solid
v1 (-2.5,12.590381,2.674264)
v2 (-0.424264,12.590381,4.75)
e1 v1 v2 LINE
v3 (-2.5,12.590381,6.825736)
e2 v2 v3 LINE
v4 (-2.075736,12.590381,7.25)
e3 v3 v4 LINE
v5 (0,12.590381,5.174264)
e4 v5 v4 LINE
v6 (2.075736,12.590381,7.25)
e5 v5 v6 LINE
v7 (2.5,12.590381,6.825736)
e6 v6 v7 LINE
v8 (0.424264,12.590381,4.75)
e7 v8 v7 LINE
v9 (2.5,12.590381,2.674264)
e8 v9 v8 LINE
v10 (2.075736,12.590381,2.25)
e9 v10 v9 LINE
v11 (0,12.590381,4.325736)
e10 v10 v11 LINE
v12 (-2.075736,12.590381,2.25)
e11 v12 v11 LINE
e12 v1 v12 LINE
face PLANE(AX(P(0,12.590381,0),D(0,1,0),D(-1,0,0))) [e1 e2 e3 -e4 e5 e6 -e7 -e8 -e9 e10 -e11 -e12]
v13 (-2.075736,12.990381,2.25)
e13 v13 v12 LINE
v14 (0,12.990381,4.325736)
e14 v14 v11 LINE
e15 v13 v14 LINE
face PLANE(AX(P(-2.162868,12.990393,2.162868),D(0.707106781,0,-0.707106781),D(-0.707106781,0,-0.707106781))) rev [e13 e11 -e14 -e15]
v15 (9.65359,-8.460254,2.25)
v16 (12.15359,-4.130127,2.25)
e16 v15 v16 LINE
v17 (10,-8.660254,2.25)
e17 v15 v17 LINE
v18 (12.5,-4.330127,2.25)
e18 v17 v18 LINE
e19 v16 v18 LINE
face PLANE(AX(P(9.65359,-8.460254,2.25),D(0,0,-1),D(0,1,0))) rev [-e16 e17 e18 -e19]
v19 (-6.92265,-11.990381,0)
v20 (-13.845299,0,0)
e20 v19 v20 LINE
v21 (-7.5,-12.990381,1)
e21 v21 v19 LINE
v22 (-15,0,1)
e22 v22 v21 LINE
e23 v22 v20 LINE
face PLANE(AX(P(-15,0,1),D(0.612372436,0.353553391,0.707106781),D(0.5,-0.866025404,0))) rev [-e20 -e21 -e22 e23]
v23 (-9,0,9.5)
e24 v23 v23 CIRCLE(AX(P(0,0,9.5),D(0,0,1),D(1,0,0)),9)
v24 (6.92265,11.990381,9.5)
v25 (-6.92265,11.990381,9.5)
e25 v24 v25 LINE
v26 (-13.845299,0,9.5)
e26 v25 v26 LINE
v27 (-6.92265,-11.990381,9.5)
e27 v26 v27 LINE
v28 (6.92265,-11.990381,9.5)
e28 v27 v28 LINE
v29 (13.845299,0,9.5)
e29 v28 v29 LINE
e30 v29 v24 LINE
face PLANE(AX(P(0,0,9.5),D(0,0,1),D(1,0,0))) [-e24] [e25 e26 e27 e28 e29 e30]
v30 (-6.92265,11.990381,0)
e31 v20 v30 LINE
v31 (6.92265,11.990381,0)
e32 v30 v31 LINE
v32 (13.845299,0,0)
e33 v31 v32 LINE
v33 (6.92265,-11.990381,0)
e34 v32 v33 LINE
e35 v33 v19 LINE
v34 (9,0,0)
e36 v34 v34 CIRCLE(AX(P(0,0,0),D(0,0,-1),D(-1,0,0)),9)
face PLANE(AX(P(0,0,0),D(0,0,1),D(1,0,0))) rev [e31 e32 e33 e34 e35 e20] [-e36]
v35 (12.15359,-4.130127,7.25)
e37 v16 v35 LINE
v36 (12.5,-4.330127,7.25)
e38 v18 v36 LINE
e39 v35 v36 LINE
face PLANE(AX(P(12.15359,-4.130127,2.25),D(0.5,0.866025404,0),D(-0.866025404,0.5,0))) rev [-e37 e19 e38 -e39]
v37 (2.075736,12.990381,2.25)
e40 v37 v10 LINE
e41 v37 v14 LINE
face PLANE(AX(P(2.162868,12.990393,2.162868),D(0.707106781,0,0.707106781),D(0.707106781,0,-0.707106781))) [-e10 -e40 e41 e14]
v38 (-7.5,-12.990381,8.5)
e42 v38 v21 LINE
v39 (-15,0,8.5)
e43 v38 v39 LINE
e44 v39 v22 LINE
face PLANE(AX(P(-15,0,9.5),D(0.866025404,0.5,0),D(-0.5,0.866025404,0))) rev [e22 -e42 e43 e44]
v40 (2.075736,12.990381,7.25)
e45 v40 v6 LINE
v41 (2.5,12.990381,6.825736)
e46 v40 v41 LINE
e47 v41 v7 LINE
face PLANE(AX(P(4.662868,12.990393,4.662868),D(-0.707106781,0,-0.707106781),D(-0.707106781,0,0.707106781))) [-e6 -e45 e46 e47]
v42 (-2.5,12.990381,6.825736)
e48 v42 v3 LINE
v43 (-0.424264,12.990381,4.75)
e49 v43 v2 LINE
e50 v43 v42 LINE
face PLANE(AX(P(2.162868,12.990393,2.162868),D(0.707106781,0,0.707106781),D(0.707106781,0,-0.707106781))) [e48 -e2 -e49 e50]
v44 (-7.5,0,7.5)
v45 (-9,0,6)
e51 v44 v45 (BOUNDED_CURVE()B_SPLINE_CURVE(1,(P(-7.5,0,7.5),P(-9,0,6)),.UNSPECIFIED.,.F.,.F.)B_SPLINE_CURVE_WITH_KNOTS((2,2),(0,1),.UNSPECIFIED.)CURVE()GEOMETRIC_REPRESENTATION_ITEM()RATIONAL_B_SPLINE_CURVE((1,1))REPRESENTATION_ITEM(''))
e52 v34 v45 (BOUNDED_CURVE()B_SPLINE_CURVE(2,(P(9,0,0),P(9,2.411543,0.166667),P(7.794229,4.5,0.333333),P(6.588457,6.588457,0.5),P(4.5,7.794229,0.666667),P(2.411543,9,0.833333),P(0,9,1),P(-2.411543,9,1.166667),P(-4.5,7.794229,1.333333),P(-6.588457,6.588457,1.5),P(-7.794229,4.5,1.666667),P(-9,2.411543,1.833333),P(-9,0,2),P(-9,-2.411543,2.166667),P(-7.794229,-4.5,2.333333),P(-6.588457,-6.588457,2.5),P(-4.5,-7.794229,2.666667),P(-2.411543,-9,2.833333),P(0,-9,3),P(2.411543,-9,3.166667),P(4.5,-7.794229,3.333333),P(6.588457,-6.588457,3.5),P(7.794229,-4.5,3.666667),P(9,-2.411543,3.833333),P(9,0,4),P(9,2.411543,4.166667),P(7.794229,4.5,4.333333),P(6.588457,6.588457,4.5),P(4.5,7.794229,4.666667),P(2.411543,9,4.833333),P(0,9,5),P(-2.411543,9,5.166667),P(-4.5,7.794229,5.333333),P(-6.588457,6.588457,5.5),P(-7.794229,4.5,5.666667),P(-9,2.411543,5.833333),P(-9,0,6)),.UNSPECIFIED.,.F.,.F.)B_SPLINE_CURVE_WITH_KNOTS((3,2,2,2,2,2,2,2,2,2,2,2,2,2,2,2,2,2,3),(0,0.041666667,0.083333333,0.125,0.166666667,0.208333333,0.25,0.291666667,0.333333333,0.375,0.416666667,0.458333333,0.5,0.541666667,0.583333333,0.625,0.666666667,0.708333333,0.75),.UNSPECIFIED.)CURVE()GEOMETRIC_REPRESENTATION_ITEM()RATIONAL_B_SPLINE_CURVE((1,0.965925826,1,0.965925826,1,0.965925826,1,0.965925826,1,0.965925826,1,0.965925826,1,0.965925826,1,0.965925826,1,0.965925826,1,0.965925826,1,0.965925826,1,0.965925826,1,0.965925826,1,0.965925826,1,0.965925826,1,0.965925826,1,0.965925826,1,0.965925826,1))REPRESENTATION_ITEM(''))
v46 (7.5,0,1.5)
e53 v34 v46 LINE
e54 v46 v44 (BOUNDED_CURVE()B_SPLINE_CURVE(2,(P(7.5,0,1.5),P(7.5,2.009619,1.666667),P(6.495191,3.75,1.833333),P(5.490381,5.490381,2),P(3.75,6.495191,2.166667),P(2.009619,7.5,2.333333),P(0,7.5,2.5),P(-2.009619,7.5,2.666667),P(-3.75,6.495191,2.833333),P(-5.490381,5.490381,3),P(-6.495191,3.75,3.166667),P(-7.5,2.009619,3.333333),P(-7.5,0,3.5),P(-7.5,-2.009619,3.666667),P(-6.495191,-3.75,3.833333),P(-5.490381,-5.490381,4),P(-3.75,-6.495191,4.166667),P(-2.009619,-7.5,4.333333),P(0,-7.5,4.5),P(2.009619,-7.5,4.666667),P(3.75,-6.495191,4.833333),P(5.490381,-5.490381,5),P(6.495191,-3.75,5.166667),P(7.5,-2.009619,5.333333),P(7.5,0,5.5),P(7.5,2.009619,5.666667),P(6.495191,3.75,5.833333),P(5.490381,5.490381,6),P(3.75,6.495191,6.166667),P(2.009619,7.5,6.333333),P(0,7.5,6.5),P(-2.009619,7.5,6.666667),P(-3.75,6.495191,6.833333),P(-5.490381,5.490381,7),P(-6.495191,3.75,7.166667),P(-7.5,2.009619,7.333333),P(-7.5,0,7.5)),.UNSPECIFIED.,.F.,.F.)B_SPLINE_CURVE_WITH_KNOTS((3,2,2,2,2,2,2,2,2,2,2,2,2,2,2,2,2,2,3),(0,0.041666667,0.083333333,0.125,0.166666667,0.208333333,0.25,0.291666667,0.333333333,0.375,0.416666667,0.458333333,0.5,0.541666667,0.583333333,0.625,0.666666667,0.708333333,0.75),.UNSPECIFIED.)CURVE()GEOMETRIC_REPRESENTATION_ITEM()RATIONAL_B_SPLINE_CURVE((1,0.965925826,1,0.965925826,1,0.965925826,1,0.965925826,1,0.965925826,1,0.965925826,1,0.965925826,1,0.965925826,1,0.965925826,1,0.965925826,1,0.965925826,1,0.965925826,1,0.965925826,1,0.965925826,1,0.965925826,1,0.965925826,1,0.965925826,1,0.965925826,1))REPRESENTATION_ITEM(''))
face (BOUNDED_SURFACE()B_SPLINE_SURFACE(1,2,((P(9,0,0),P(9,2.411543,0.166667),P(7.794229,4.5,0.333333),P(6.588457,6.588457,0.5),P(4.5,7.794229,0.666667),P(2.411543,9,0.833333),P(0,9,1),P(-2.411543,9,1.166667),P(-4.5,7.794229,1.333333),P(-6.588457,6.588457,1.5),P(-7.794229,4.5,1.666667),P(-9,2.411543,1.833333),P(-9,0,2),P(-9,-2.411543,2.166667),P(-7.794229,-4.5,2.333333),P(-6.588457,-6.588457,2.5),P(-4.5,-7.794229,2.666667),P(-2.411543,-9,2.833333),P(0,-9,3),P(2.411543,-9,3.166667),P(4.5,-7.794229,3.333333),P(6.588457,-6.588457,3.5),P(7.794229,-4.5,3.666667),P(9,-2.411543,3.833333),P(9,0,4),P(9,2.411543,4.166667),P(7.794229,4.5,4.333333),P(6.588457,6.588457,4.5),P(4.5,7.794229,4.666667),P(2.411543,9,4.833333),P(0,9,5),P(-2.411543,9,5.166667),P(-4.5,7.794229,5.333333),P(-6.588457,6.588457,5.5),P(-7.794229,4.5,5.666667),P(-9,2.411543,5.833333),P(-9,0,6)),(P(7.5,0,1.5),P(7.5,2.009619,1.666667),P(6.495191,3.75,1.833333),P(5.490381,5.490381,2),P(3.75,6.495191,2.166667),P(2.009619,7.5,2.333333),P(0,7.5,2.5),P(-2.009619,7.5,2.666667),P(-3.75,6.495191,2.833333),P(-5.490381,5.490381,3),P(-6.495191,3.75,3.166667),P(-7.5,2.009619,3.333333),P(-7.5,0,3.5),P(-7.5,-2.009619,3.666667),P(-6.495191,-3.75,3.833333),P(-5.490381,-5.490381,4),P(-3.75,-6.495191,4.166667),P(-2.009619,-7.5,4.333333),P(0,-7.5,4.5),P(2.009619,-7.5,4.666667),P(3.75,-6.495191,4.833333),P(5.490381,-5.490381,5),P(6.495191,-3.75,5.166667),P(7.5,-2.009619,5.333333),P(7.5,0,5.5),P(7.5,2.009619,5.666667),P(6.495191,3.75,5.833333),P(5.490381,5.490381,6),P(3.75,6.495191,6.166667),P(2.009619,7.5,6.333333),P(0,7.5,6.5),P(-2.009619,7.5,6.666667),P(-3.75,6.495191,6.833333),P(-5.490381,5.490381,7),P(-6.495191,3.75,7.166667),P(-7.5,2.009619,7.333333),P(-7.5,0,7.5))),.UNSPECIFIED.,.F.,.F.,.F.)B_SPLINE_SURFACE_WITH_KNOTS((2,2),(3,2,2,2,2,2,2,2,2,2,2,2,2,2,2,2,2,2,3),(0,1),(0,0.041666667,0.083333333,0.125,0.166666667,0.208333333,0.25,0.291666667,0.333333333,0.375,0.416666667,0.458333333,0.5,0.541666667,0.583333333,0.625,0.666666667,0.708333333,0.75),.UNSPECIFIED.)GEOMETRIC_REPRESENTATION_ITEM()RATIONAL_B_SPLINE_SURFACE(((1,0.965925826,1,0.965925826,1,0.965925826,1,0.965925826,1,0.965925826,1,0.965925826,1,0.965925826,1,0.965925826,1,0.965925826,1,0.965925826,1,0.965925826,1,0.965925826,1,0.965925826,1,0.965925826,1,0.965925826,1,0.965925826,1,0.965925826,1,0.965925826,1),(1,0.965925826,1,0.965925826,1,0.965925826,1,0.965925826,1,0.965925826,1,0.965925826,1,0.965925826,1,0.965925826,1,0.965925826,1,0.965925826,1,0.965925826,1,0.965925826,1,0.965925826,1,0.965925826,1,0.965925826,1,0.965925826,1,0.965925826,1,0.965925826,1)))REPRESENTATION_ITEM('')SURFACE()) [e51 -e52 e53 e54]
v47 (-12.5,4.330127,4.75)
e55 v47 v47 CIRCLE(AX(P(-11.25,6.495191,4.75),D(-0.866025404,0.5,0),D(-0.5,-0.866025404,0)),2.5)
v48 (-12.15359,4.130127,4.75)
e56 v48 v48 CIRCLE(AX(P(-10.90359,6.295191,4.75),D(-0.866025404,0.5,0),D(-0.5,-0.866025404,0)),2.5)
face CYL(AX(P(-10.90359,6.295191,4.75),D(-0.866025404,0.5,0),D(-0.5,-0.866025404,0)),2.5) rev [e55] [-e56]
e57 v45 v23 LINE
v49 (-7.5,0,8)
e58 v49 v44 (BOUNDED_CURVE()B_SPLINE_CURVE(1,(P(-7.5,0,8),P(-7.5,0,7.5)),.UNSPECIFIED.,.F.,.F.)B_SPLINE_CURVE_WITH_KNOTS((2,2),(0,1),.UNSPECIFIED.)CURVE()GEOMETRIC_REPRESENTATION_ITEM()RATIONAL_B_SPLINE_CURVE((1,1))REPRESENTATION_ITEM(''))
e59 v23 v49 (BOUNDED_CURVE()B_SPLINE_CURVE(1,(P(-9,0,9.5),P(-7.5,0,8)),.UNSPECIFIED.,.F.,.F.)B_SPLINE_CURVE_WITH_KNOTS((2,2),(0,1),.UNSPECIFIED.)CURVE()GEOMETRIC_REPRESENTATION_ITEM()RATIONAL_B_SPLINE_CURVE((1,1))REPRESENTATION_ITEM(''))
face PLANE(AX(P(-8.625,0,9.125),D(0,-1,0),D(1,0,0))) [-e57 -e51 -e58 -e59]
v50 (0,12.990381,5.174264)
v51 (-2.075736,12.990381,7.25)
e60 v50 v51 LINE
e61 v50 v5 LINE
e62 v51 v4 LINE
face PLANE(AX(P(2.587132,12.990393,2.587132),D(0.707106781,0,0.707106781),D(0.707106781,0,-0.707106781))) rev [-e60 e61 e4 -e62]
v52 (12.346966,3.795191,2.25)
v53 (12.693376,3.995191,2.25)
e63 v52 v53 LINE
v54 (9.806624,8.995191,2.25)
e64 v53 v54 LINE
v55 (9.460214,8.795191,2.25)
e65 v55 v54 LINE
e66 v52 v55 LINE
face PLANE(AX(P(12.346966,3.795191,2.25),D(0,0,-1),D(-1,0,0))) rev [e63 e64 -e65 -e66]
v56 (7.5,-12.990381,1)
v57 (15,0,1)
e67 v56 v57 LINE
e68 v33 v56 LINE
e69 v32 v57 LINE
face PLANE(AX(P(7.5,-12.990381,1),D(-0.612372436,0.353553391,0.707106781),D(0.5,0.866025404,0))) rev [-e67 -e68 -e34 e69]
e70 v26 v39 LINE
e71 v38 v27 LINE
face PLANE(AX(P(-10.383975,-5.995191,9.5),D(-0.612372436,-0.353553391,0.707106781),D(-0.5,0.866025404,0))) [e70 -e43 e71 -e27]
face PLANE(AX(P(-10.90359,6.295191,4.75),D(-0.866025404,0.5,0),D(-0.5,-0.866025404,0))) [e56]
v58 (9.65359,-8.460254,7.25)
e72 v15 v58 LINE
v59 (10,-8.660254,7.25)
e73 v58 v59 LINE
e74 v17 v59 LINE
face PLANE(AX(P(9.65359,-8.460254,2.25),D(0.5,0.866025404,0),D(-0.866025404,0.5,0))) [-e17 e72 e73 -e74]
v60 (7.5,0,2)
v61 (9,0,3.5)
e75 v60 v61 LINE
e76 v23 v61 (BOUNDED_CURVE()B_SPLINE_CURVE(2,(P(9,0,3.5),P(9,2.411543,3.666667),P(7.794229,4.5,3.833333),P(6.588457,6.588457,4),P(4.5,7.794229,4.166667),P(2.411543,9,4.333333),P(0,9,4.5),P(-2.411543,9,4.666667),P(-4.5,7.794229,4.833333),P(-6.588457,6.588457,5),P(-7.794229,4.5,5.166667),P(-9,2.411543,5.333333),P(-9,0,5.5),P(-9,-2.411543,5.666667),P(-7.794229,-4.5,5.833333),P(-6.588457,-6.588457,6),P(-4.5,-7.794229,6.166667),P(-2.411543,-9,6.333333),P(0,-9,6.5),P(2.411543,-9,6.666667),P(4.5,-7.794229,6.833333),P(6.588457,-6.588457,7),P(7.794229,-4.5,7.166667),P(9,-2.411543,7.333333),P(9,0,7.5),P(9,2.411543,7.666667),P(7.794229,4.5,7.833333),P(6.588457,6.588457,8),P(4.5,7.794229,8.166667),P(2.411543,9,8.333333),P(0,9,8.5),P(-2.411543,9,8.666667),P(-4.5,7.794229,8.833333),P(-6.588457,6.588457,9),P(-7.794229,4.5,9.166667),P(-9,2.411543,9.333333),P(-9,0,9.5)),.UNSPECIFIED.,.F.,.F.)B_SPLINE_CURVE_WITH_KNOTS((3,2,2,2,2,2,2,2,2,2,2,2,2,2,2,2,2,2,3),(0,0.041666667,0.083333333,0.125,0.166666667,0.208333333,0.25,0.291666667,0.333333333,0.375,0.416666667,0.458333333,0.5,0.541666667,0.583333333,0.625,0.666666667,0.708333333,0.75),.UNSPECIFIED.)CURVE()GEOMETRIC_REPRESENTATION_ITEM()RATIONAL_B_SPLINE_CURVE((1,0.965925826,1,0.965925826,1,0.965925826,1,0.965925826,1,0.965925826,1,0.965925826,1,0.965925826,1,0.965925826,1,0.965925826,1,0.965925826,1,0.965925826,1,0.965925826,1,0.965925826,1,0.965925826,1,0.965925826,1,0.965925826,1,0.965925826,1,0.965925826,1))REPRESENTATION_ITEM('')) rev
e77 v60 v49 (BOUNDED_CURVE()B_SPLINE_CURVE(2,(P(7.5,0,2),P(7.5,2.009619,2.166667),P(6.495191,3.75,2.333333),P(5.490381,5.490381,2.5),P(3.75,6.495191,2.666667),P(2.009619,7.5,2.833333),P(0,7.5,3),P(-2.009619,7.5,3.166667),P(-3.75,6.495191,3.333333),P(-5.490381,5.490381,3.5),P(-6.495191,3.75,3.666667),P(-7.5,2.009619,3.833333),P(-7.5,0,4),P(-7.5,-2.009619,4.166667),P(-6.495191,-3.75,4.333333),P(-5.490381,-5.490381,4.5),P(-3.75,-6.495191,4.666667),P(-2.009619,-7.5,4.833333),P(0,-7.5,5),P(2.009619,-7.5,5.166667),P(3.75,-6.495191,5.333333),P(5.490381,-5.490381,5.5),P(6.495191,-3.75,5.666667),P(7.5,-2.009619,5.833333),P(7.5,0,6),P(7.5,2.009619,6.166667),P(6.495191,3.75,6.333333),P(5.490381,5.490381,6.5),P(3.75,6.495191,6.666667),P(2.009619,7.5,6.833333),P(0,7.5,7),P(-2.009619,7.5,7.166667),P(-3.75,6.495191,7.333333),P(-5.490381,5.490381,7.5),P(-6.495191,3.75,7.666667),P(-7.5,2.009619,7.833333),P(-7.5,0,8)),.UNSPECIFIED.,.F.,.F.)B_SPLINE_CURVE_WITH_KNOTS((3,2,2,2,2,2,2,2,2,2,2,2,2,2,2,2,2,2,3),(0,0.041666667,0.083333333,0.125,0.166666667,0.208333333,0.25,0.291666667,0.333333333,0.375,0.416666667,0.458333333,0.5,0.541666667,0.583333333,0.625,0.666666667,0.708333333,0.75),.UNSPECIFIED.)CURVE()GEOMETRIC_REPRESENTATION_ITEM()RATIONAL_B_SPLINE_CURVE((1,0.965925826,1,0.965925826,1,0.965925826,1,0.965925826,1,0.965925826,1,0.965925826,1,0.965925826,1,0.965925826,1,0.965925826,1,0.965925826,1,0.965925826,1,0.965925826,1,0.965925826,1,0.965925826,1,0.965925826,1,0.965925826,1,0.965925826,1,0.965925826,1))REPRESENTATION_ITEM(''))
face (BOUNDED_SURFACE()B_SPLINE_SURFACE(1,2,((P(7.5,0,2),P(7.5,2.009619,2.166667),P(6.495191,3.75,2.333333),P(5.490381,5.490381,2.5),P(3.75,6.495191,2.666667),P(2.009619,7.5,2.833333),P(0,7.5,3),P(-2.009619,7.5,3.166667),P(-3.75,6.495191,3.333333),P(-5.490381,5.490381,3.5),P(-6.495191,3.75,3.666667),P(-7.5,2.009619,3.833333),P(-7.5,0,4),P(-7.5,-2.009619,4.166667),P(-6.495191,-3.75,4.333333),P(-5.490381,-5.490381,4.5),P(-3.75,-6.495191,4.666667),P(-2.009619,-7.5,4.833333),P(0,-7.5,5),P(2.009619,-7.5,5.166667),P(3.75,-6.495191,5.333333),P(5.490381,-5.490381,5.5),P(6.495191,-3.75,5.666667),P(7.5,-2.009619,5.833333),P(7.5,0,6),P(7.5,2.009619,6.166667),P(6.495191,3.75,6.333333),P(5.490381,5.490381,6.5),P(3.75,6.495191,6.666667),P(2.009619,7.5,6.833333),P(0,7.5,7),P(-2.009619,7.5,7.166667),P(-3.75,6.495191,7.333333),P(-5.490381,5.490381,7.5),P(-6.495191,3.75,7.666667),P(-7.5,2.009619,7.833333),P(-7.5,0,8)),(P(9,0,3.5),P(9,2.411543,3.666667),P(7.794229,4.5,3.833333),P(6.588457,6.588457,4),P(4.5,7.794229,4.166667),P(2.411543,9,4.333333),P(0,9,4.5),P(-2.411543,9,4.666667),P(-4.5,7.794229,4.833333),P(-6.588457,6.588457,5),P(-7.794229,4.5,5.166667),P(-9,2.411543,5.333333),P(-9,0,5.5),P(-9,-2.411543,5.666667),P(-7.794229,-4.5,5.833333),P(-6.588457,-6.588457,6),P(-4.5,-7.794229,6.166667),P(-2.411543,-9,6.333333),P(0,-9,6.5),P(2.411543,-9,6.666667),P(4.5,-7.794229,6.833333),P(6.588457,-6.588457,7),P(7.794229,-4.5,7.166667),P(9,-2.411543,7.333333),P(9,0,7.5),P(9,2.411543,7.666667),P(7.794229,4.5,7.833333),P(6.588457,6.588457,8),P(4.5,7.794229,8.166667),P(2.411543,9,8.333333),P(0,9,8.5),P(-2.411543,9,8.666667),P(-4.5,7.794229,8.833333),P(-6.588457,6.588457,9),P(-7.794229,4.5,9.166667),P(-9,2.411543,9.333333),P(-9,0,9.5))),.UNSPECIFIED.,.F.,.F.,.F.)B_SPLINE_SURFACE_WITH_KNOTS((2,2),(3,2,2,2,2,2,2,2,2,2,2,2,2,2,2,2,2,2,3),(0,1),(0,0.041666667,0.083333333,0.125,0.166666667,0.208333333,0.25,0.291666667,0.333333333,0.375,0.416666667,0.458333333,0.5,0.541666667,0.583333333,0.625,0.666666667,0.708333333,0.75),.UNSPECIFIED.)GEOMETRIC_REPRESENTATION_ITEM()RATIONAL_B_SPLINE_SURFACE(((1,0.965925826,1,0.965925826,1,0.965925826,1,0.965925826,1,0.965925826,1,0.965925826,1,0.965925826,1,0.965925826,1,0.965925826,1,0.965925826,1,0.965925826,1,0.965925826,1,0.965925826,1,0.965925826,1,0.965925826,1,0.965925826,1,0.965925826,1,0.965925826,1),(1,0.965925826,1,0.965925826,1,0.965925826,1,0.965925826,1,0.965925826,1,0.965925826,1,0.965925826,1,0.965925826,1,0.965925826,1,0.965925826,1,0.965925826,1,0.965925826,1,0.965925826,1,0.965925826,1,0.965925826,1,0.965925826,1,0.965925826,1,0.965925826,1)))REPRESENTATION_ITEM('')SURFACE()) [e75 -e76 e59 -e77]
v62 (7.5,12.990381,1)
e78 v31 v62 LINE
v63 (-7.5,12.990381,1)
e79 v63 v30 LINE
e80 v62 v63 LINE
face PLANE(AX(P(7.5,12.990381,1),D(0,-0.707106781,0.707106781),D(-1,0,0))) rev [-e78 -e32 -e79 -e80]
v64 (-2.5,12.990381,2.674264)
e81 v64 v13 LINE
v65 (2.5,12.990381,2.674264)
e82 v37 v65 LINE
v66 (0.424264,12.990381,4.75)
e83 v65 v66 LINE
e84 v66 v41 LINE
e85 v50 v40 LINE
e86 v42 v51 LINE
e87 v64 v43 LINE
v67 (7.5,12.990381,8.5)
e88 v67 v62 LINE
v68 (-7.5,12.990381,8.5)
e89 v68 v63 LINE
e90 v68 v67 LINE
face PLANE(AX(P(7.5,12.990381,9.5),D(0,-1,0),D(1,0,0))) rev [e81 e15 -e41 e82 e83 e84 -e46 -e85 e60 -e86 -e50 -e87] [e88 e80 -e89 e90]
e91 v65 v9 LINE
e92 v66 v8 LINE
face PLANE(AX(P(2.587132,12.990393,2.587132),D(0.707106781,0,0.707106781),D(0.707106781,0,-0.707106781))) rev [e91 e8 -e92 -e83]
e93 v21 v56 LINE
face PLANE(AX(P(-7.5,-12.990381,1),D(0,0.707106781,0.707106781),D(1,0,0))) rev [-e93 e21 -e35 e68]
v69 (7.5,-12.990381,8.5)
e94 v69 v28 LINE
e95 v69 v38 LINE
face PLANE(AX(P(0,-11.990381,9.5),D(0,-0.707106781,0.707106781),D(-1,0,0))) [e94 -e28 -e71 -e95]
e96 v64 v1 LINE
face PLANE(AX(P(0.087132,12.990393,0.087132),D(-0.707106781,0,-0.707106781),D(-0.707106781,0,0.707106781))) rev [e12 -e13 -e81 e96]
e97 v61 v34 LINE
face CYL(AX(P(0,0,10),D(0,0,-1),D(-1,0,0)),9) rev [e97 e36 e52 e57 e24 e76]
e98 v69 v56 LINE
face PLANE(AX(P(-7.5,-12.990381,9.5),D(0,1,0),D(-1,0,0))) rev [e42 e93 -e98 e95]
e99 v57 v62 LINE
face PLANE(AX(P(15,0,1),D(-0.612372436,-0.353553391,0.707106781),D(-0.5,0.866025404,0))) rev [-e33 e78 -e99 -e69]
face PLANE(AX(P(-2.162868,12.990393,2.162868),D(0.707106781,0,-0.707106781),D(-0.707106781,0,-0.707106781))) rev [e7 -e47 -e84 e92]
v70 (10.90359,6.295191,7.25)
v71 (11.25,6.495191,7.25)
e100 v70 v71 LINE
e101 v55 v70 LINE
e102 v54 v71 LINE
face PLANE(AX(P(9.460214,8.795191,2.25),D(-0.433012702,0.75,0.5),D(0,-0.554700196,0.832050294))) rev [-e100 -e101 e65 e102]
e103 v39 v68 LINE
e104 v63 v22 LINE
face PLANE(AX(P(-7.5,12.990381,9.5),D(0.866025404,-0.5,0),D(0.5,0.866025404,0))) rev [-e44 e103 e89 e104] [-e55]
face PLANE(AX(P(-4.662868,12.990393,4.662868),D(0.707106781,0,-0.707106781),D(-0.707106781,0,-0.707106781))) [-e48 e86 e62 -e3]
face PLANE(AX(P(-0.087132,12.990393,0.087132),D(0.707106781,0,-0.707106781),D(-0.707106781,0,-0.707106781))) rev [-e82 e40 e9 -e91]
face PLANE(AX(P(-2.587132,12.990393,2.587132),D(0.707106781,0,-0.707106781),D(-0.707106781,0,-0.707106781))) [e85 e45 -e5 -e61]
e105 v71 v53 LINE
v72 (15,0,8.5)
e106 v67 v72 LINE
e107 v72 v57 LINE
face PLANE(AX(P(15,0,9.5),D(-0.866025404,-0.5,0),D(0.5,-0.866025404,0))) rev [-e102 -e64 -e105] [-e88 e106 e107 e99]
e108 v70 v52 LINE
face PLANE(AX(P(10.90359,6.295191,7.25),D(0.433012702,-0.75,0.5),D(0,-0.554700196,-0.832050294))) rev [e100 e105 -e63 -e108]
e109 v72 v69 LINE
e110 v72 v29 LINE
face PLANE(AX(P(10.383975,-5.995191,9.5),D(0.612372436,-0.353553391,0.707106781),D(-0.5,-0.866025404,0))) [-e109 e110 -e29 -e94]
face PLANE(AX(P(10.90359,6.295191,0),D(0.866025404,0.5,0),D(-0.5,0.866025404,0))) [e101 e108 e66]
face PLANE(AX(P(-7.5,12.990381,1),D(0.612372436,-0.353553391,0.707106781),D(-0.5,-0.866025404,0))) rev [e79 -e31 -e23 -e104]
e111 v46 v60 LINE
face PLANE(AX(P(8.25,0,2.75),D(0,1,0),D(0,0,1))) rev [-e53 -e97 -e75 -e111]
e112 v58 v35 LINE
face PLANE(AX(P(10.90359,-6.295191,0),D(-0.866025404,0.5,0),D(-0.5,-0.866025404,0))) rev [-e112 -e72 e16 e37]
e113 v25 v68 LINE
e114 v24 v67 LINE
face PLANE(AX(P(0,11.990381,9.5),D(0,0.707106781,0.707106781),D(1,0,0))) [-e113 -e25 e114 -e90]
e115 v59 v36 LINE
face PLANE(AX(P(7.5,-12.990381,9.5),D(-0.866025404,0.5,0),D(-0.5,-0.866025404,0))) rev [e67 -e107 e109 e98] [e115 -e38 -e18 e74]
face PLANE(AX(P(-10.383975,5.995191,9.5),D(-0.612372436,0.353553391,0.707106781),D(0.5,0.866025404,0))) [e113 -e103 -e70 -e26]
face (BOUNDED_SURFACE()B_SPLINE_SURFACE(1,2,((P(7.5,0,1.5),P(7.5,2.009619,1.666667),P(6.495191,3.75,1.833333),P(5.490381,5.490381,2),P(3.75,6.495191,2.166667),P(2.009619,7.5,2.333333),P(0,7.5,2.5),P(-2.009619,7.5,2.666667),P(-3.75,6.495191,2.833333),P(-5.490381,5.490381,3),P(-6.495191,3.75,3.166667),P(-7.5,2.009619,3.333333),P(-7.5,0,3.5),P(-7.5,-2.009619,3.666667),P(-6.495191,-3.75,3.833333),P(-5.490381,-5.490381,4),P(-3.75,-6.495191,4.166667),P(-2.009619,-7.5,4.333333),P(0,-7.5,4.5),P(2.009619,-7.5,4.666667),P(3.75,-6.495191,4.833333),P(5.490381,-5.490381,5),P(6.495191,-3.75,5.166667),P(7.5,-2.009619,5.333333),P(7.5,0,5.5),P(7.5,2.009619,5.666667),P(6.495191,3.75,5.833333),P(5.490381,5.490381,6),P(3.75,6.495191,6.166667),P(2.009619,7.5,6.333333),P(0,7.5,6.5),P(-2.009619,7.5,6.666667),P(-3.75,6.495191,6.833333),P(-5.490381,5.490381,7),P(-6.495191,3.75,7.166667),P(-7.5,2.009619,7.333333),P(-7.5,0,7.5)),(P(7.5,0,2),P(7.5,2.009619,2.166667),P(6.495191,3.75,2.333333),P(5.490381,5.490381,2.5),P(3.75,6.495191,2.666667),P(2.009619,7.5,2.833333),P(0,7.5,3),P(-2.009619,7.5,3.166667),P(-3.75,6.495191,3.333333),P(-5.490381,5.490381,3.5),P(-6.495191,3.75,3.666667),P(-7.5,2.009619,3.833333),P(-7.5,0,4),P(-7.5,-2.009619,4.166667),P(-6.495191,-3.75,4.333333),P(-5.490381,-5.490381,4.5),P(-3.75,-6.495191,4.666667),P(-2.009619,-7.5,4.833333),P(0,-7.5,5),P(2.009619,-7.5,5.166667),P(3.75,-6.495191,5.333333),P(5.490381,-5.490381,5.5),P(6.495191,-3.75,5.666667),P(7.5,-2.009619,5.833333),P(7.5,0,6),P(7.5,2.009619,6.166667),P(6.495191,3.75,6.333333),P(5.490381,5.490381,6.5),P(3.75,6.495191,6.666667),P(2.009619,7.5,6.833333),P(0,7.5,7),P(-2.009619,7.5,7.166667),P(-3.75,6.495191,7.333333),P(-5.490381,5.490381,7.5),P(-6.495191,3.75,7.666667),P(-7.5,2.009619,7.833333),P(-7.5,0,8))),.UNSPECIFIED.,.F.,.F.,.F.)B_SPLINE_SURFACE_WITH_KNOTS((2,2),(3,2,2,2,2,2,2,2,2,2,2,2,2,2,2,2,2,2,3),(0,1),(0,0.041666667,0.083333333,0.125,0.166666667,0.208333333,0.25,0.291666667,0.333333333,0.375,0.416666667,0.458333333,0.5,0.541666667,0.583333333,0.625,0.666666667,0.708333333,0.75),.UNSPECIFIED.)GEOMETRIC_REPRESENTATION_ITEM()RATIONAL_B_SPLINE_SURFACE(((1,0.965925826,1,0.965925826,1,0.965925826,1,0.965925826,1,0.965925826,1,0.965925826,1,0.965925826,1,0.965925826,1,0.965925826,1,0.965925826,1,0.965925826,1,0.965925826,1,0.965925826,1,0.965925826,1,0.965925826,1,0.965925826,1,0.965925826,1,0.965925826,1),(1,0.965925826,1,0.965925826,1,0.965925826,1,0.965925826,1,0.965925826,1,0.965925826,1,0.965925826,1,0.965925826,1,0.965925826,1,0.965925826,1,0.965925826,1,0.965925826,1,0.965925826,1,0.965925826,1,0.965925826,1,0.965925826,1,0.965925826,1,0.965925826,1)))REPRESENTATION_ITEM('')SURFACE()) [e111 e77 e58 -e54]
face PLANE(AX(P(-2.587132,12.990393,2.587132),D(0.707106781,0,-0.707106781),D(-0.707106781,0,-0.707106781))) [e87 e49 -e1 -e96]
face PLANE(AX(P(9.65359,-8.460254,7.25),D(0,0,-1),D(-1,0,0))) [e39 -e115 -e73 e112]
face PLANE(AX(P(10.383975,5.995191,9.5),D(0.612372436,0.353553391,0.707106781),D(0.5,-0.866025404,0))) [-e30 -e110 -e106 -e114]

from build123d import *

# Parameters (mm, degrees)
EXTRUDE_1_DEPTH          = 9.5
SKETCH_3_R               = 9
CUT_EXTRUDE_1_DEPTH      = 10
SWEEP_1_PITCH            = 4
CHAMFER_1_SIZE           = 1
CUT_EXTRUDE_3_DEPTH      = 0.4
SKETCH_12_R              = 2.5
CUT_EXTRUDE_4_DEPTH      = 0.4
CUT_EXTRUDE_6_DEPTH      = 32.468328554
CUT_EXTRUDE_6_DEPTH_BACK = 0.4
SKETCH_11_W              = 5
SKETCH_11_H              = 5
CUT_EXTRUDE_7_DEPTH      = 0.4


with BuildPart() as part:
    # 草图1 → 凸台-拉伸1 (new body)
    with BuildSketch(Plane.XY):
        Polygon((15, 0), (7.5, 12.990381057), (-7.5, 12.990381057), (-15, 0), (-7.5, -12.990381057), (7.5, -12.990381057), align=None)
    extrude(amount=EXTRUDE_1_DEPTH)

    # 草图3 → 切除-拉伸1 (cut)
    with BuildSketch(Plane(origin=(0, 0, 0), x_dir=(-1, 0, 0), z_dir=(0, 0, -1))):
        Circle(SKETCH_3_R)
    extrude(amount=-CUT_EXTRUDE_1_DEPTH, mode=Mode.SUBTRACT)

    # 扫描1: the profile of 草图5 profile screwed along a right-hand helix of 1.5 turns, 12 arcs to a turn; built about Z, then put on its axis
    sweep_1_z = Axis((0, 0, 0), (0, 0, 1))
    sweep_1_corners = [(9.0003, 0, -1.7503), (9.0003, 0, 1.7503), (7.5, 0, 0.25), (7.5, 0, -0.25)]
    with BuildLine(mode=Mode.PRIVATE) as sweep_1_profile:
        Line(sweep_1_corners[0], sweep_1_corners[1])
        Line(sweep_1_corners[1], sweep_1_corners[2])
        Line(sweep_1_corners[2], sweep_1_corners[3])
        Line(sweep_1_corners[3], sweep_1_corners[0])
    sweep_1_cap = Face(sweep_1_profile.wire())
    sweep_1_turn_angles = [0, 15, 30, 45, 60, 75, 90, 105, 120, 135, 150, 165, 180, 195, 210, 225, 240, 255, 270, 285, 300, 315, 330, 345, 360]
    sweep_1_turn_weights = [1, 0.9659258262890683, 1, 0.9659258262890683, 1, 0.9659258262890683, 1, 0.9659258262890683, 1, 0.9659258262890683, 1, 0.9659258262890683, 1, 0.9659258262890683, 1, 0.9659258262890683, 1, 0.9659258262890683, 1, 0.9659258262890683, 1, 0.9659258262890683, 1, 0.9659258262890683, 1]
    sweep_1_turn_rails = [Edge.make_bspline([Vector(p[0], p[1], 0).rotate(sweep_1_z, sweep_1_turn_angles[k]) / sweep_1_turn_weights[k] + Vector(0, 0, p[2] + SWEEP_1_PITCH * sweep_1_turn_angles[k] / 360) for k in range(25)], [0, 0, 0, 1, 1, 2, 2, 3, 3, 4, 4, 5, 5, 6, 6, 7, 7, 8, 8, 9, 9, 10, 10, 11, 11, 12, 12, 12], 2, sweep_1_turn_weights) for p in sweep_1_corners]
    sweep_1_turn_sides = [Face.make_surface_from_curves(sweep_1_turn_rails[p[0]], sweep_1_turn_rails[p[1]]) for p in [(0, 1), (1, 2), (2, 3), (3, 0)]]
    sweep_1_last_angles = [360, 375, 390, 405, 420, 435, 450, 465, 480, 495, 510, 525, 540]
    sweep_1_last_weights = [1, 0.9659258262890683, 1, 0.9659258262890683, 1, 0.9659258262890683, 1, 0.9659258262890683, 1, 0.9659258262890683, 1, 0.9659258262890658, 1]
    sweep_1_last_rails = [Edge.make_bspline([Vector(p[0], p[1], 0).rotate(sweep_1_z, sweep_1_last_angles[k]) / sweep_1_last_weights[k] + Vector(0, 0, p[2] + SWEEP_1_PITCH * sweep_1_last_angles[k] / 360) for k in range(13)], [0, 0, 0, 1, 1, 2, 2, 3, 3, 4, 4, 5, 5, 6, 6, 6], 2, sweep_1_last_weights) for p in sweep_1_corners]
    sweep_1_last_sides = [Face.make_surface_from_curves(sweep_1_last_rails[p[0]], sweep_1_last_rails[p[1]]) for p in [(0, 1), (1, 2), (2, 3), (3, 0)]]
    sweep_1 = Plane(origin=(0, 0, 1.75), x_dir=(1, 0, 0), z_dir=(0, 0, 1)) * Solid(Shell([*sweep_1_turn_sides, *sweep_1_last_sides, sweep_1_cap, sweep_1_cap.rotate(sweep_1_z, 540).moved(Location((0, 0, SWEEP_1_PITCH * 540 / 360)))]))
    add(sweep_1)

    # 倒角1
    chamfer_1_edges = [part.edges().sort_by_distance(p)[0] for p in [
        (-11.25, 6.495190528, 9.5),
        (-11.25, -6.495190528, 9.5),
        (0, -12.990381057, 9.5),
        (11.25, -6.495190528, 9.5),
        (11.25, 6.495190528, 9.5),
        (11.25, -6.495190528, 0),
        (0, -12.990381057, 0),
        (-11.25, -6.495190528, 0),
        (-11.25, 6.495190528, 0),
        (0, 12.990381057, 0),
        (11.25, 6.495190528, 0),
        (0, 12.990381057, 9.5),
    ]]
    chamfer(chamfer_1_edges, length=CHAMFER_1_SIZE)

    # 草图7 → 切除-拉伸3 (cut)
    with BuildSketch(Plane(origin=(11.25, 6.495190528, 0), x_dir=(0, 0, -1), z_dir=(0.8660254037844386, 0.5000000000000003, 0))):
        Polygon((-2.25, 2.886751346), (-7.25, 0), (-2.25, -2.886751346), align=None)
    extrude(amount=-CUT_EXTRUDE_3_DEPTH, mode=Mode.SUBTRACT)

    # 草图12 → 切除-拉伸4 (cut)
    with BuildSketch(Plane(origin=(-11.25, 6.495190528, 0), x_dir=(0, 0, 1), z_dir=(-0.8660254037844384, 0.5000000000000006, 0))):
        with Locations(Location((4.75, 0, 0), (0, 0, 270))):
            Circle(SKETCH_12_R)
    extrude(amount=-CUT_EXTRUDE_4_DEPTH, mode=Mode.SUBTRACT)

    # 草图10 → 切除-拉伸6 (cut, two sides: drawn at the far end of the back side and taken through both)
    with BuildSketch(Plane(origin=(0, 12.990381057, 0), x_dir=(1, 0, 0), z_dir=(0, 1, 0)).offset(-CUT_EXTRUDE_6_DEPTH_BACK)):
        Polygon((2.075735931, -2.25), (-2.5, -6.825735931), (-2.075735931, -7.25), (2.5, -2.674264069), align=None)
        Polygon((-2.5, -2.674264069), (2.075735931, -7.25), (2.5, -6.825735931), (-2.075735931, -2.25), align=None)
    extrude(amount=CUT_EXTRUDE_6_DEPTH + CUT_EXTRUDE_6_DEPTH_BACK, mode=Mode.SUBTRACT)

    # 草图11 → 切除-拉伸7 (cut)
    with BuildSketch(Plane(origin=(11.25, -6.495190528, 0), x_dir=(0, 0, -1), z_dir=(0.8660254037844387, -0.5000000000000001, 0))):
        with Locations((-4.75, 0)):
            Rectangle(SKETCH_11_W, SKETCH_11_H)
    extrude(amount=-CUT_EXTRUDE_7_DEPTH, mode=Mode.SUBTRACT)


solid = part.part
